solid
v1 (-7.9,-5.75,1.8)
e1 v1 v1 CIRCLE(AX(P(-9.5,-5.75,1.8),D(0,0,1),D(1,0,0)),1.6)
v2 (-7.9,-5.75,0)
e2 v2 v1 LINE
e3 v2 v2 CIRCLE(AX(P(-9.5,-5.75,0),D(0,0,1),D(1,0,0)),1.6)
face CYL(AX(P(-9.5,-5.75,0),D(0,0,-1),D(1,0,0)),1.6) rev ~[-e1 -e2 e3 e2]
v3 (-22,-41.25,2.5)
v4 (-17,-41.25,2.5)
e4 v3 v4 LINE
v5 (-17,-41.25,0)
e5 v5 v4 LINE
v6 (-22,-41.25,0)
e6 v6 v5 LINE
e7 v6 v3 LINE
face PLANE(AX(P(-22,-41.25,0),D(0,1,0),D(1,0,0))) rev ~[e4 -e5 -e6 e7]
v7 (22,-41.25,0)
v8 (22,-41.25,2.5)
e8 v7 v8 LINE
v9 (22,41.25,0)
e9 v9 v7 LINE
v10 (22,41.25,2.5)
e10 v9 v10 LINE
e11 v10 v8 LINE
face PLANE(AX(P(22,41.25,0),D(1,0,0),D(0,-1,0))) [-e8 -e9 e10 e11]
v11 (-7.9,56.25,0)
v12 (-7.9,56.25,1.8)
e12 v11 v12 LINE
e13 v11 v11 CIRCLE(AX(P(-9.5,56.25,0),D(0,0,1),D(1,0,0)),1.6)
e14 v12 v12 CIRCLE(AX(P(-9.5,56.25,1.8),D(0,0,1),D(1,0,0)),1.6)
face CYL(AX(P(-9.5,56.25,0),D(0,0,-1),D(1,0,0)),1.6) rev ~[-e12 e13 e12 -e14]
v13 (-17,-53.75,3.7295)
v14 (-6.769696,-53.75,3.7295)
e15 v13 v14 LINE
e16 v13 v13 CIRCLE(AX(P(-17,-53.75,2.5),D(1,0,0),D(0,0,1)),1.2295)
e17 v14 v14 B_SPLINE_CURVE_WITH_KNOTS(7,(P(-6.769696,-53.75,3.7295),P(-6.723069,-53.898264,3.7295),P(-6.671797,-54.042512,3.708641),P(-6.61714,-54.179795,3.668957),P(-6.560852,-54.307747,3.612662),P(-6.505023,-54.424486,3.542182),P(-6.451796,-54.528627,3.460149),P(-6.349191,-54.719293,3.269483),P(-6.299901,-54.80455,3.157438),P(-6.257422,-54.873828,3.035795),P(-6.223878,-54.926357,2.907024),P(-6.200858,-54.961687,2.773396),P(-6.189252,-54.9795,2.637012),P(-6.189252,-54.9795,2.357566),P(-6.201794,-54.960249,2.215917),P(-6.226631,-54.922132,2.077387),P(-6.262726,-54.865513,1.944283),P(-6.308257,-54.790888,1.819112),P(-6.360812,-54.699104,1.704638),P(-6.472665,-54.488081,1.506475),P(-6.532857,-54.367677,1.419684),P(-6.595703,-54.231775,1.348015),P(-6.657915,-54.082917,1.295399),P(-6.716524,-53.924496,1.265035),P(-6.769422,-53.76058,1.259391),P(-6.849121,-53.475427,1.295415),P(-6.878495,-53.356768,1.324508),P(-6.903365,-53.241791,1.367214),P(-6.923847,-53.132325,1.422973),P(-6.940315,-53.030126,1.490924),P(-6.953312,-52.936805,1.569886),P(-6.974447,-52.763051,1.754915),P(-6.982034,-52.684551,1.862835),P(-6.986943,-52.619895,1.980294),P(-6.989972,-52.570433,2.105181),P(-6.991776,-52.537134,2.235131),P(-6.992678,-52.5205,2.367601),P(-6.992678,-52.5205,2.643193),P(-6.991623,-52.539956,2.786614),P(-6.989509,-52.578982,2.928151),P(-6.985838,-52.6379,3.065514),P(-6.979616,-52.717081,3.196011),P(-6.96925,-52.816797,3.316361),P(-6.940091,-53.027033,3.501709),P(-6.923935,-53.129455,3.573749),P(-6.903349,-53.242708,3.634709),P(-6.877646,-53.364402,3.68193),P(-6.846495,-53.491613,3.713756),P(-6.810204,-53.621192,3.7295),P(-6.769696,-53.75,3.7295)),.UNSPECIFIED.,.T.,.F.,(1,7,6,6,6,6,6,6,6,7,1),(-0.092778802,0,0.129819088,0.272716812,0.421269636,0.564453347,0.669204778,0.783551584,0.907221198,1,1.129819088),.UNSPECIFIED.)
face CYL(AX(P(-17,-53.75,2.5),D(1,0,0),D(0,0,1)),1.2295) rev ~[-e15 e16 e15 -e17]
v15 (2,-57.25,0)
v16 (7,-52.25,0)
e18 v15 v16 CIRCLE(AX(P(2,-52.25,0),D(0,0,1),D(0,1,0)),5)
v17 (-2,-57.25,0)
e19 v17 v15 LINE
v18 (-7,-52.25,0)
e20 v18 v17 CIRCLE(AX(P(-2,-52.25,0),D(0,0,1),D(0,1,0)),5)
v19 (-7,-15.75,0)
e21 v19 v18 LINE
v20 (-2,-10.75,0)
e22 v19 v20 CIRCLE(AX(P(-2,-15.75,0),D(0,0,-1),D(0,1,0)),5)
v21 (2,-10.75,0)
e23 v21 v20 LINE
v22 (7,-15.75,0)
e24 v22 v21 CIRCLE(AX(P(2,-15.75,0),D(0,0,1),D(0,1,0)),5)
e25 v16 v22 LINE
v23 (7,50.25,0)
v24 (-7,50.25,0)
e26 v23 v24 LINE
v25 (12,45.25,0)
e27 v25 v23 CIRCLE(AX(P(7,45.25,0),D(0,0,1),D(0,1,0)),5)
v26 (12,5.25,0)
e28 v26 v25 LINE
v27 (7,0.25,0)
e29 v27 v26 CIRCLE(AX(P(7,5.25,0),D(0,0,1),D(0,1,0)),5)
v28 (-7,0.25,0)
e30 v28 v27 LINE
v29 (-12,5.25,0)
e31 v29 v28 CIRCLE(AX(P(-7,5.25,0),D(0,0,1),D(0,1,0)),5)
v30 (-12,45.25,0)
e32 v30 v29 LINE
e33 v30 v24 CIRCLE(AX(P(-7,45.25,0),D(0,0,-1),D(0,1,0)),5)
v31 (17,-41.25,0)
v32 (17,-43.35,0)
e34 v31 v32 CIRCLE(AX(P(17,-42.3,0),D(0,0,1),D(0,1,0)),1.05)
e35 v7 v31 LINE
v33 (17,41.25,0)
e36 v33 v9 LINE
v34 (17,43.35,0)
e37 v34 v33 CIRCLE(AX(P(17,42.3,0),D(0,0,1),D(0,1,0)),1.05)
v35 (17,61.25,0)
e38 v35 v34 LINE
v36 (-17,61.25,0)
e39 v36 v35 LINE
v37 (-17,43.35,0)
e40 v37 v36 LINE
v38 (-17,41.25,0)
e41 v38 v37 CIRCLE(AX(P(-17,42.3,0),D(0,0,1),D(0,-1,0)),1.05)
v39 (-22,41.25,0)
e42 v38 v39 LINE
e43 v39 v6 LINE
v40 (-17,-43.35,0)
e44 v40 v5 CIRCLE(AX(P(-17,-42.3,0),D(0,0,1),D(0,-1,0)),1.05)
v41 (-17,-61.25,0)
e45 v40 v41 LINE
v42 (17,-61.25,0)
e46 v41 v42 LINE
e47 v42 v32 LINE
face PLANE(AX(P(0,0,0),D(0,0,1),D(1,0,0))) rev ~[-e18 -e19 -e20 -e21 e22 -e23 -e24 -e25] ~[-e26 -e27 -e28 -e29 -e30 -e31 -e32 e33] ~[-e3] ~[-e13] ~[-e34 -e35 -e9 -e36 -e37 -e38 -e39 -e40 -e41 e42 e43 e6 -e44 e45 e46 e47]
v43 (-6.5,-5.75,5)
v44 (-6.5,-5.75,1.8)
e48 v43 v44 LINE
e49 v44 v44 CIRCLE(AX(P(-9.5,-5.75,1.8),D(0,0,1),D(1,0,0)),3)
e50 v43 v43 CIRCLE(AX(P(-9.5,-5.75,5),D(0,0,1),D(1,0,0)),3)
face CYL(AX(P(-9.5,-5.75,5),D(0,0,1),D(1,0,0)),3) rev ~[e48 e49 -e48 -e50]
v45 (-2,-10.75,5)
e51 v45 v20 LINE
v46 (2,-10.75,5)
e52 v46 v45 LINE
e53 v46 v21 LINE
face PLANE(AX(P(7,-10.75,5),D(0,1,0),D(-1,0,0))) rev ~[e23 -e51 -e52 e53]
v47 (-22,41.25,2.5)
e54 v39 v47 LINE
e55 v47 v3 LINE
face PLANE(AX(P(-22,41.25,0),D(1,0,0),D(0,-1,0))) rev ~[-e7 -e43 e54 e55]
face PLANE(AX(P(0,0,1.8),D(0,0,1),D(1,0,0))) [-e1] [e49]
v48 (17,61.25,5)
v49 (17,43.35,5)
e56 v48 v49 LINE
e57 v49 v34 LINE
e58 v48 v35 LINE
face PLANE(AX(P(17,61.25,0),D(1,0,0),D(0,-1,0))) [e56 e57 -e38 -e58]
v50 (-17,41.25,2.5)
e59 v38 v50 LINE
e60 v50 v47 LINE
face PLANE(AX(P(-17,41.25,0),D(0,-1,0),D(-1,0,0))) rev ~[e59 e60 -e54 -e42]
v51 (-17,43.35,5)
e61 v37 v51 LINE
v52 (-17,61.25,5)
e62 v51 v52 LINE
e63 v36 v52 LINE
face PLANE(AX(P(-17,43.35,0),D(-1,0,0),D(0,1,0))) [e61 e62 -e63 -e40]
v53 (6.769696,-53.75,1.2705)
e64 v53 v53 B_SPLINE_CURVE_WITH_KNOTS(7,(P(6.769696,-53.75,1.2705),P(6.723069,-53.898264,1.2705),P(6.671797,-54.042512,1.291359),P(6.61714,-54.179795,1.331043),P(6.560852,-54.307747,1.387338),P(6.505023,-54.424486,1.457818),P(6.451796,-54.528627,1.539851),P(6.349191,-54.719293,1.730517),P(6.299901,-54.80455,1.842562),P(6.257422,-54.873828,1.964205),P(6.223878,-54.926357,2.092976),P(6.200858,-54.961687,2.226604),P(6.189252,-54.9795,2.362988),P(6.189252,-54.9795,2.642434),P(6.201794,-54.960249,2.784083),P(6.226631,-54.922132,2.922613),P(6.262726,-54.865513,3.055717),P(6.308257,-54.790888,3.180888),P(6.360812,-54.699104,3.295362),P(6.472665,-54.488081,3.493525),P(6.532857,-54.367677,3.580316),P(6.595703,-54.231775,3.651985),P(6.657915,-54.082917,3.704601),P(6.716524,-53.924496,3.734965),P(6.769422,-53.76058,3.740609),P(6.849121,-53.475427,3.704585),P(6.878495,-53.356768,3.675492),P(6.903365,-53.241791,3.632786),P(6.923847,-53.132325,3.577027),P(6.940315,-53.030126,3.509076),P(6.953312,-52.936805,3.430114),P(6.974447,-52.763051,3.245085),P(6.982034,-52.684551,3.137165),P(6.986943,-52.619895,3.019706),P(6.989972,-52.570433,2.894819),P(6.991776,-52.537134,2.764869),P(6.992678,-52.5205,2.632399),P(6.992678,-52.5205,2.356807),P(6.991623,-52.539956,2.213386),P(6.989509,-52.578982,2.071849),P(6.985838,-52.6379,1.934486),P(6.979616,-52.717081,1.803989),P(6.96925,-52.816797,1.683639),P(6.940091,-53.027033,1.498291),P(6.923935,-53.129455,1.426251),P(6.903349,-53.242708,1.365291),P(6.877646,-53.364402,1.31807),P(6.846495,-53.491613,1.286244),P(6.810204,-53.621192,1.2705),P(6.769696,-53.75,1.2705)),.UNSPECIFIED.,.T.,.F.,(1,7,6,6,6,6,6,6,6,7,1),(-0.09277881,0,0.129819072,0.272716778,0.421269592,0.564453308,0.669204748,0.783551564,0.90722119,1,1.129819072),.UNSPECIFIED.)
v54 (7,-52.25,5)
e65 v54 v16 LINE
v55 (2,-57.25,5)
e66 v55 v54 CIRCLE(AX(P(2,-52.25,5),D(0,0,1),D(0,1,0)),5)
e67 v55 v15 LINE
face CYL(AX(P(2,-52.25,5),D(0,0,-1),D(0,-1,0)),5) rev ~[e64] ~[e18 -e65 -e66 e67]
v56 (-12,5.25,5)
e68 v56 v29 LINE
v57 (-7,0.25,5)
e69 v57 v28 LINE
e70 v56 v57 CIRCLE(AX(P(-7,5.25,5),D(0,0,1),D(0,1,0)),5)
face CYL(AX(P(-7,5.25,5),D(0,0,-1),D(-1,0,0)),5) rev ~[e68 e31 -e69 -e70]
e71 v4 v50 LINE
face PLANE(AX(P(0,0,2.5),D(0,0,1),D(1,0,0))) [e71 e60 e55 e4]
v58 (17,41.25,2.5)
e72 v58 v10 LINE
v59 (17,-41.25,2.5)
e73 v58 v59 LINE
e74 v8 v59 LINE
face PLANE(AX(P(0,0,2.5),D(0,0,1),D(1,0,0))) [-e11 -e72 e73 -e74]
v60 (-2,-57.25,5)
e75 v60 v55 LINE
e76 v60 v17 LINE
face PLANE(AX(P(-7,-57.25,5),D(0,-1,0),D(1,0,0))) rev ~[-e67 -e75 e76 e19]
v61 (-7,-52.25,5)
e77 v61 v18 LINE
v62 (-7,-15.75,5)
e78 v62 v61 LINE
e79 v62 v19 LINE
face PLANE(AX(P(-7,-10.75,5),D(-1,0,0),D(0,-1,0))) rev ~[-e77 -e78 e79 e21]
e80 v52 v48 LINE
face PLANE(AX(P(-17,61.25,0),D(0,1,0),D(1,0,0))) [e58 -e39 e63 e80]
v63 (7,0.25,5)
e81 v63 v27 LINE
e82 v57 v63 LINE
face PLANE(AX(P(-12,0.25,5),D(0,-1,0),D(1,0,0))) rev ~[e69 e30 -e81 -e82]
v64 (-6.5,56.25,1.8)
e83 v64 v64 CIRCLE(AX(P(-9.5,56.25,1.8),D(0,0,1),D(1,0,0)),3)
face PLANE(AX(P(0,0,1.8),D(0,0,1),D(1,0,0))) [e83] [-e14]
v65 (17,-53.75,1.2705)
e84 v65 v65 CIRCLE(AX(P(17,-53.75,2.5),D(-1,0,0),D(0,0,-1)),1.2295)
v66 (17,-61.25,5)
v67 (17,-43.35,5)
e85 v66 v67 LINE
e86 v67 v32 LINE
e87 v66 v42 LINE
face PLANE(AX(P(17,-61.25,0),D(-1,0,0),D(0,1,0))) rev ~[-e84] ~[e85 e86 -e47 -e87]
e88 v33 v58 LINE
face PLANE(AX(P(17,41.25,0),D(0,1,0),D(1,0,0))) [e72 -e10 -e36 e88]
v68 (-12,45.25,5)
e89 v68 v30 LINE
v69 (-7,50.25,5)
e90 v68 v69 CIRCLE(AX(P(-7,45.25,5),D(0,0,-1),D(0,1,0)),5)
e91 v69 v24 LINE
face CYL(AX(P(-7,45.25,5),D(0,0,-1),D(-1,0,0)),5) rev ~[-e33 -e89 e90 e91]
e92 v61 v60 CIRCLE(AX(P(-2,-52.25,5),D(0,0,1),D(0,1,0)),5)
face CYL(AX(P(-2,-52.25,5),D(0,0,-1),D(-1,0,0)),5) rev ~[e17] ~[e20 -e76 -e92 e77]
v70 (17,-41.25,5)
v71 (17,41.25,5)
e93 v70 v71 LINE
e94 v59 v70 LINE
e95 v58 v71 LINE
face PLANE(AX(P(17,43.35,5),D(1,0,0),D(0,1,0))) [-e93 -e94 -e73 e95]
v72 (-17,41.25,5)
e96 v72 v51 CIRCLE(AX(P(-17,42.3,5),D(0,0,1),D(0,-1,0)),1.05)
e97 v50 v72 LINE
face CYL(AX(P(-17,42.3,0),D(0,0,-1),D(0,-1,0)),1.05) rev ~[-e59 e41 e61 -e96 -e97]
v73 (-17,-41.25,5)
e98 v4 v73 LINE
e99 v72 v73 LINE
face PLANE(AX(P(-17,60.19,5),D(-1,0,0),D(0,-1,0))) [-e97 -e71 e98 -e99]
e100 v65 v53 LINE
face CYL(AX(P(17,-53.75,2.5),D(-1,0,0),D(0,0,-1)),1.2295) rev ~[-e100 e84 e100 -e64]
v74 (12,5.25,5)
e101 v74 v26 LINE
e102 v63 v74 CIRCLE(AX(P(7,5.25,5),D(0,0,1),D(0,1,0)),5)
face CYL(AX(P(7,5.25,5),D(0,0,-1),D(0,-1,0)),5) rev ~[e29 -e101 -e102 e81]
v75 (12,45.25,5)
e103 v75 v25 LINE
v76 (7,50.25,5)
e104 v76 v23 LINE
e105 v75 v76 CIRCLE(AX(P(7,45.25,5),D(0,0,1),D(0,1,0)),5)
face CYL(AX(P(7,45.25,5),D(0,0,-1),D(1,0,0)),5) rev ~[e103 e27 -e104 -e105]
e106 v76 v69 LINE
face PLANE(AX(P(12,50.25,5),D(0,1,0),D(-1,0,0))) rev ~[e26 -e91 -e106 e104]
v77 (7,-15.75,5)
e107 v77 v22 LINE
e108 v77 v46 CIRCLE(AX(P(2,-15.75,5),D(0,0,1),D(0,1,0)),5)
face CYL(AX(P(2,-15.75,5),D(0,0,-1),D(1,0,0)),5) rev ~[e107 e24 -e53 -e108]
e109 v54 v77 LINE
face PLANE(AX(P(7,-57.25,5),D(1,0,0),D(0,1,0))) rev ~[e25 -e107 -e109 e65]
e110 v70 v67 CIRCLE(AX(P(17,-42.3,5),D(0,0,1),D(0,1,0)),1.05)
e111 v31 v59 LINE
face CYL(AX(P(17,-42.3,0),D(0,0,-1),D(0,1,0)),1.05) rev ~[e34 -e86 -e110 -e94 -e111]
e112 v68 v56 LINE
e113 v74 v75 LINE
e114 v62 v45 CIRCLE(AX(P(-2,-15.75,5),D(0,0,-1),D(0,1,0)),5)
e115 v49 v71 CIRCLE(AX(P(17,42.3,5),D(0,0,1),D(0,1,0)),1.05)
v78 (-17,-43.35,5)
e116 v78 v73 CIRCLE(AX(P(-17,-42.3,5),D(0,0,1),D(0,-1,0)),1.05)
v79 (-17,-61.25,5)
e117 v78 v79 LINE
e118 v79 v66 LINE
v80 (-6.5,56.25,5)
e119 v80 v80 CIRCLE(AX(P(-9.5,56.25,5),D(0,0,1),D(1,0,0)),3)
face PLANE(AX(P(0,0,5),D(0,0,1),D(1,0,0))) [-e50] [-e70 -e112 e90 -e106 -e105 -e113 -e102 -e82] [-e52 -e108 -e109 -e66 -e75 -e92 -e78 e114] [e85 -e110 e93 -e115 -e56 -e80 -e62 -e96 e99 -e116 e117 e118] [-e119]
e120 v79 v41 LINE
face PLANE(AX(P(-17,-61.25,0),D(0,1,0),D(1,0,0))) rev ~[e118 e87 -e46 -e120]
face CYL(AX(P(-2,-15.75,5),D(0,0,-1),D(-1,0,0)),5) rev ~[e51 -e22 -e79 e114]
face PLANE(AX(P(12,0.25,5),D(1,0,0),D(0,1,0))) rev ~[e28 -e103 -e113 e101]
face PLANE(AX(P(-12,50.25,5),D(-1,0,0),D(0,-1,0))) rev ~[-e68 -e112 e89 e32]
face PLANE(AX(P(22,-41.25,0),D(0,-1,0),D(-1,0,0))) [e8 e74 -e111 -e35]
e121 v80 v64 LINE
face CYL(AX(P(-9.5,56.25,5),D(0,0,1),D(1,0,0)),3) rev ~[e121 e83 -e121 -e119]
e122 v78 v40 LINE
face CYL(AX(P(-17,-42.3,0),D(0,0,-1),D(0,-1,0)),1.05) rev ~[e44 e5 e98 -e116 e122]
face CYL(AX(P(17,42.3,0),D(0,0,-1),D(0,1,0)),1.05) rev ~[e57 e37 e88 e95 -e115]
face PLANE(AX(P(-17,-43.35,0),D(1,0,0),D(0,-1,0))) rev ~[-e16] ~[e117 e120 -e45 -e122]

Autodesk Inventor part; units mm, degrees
ref_plane "YZ Plane" through (0, 0, 0) normal (1, 0, 0) x (0, 1, 0)
ref_plane "XZ Plane" through (0, 0, 0) normal (0, 1, 0) x (-1, 0, 0)
ref_plane "XY Plane" through (0, 0, 0) normal (0, 0, 1) x (1, 0, 0)
sketch "スケッチ1" plane through (0, 0, 0) normal (0, 0, 1) x (1, 0, 0)
  line L0 (-17, -61.25) -> (17, -61.25) construction
  line L1 (17, -61.25) -> (17, 61.25) construction
  line L2 (17, 61.25) -> (-17, 61.25) construction
  line L3 (-17, 61.25) -> (-17, -61.25) construction
  line L4 (-17, -61.25) -> (17, 61.25) construction
  line L5 (17, -61.25) -> (-17, 61.25) construction
  line L6 (-17, 43.35) -> (-17, 61.25)
  line L7 (-17, 61.25) -> (17, 61.25)
  line L8 (17, 61.25) -> (17, 43.35)
  line L9 (-17, -43.35) -> (-17, -61.25)
  line L10 (-17, -61.25) -> (17, -61.25)
  line L11 (17, -61.25) -> (17, -43.35)
  line L12 (-17, 41.25) -> (-22, 41.25)
  line L13 (-22, 41.25) -> (-22, -41.25)
  line L14 (-22, -41.25) -> (-17, -41.25)
  line L15 (17, 41.25) -> (22, 41.25)
  line L16 (22, 41.25) -> (22, -41.25)
  line L17 (22, -41.25) -> (17, -41.25)
  arc A0 (-17, 41.25) -> (-17, 43.35) centre (-17, 42.3) ccw
  arc A1 (-17, -43.35) -> (-17, -41.25) centre (-17, -42.3) ccw
  arc A2 (17, 43.35) -> (17, 41.25) centre (17, 42.3) ccw
  arc A3 (17, -41.25) -> (17, -43.35) centre (17, -42.3) ccw
  line L18 (0, 0) -> (17, 0) construction
  line L19 (0, 0) -> (0, 61.25) construction
  line L20 (-9.5, 56.25) -> (9.5, 56.25) construction
  line L21 (9.5, 56.25) -> (9.5, -5.75) construction
  line L22 (9.5, -5.75) -> (-9.5, -5.75) construction
  line L23 (-9.5, -5.75) -> (-9.5, 56.25) construction
  circle A4 centre (-9.5, 56.25) radius 1.6
  circle A5 centre (-9.5, -5.75) radius 1.6
  point P0 (0, 56.25)
  point P1 (0, 0)
  dimension "d87" = 1.05
  dimension "d88" = 122.5
  dimension "d89" = 5
  dimension "d90" = 20
  dimension "d91" = 34
  dimension "d92" = 3.2
  dimension "d93" = 7.5
  dimension "d94" = 5
  dimension "d112" = 62
extrude "押し出し1" add sketch "スケッチ1" along normal blind 5
sketch "スケッチ2" plane through (0, 0, 5) normal (0, 0, 1) x (1, 0, 0)
  line L0 (-17, 61.25) -> (-17, 43.35) projected
  line L1 (17, 43.35) -> (17, 61.25) projected
  line L2 (-40.5884, 60.19) -> (-17, 60.19)
  line L3 (-17, 60.19) -> (-17, -101.7483)
  line L4 (-17, -101.7483) -> (-40.5884, -101.7483)
  line L5 (-40.5884, -101.7483) -> (-40.5884, 60.19)
  line L6 (53.5752, 90.4043) -> (17, 90.4043)
  line L7 (17, 90.4043) -> (17, -93.5321)
  line L8 (17, -93.5321) -> (53.5752, -93.5321)
  line L9 (53.5752, -93.5321) -> (53.5752, 90.4043)
  point P0 (0, 0)
extrude "押し出し2" cut sketch "スケッチ2" against normal blind 2.5
sketch "スケッチ3" plane through (0, 0, 5) normal (0, 0, 1) x (1, 0, 0)
  line L0 (17, -41.25) -> (17, 41.25) projected
  line L1 (17, 61.25) -> (-17, 61.25) projected
  line L2 (-17, 41.25) -> (-17, -41.25) projected
  line L3 (-17, -61.25) -> (17, -61.25) projected
  circle A0 centre (-9.5, -5.75) radius 1.6 projected
  circle A1 centre (-9.5, 56.25) radius 1.6 projected
  line L4 (-7, -57.25) -> (7, -57.25)
  line L5 (7, -57.25) -> (7, -10.75)
  line L6 (7, -10.75) -> (-7, -10.75)
  line L7 (-7, -10.75) -> (-7, -57.25)
  line L8 (-12, 0.25) -> (12, 0.25)
  line L9 (12, 0.25) -> (12, 50.25)
  line L10 (12, 50.25) -> (-12, 50.25)
  line L11 (-12, 50.25) -> (-12, 0.25)
  line L12 (0, 61.25) -> (0, -61.25) construction
  line L13 (-17, 0) -> (17, 0) construction
  point P0 (0, 0)
  point P1 (0, 0.25)
  dimension "d100" = 4
  dimension "d105" = 11
  dimension "d108" = 5
  dimension "d114" = 6
  dimension "d115" = 10
  dimension "d116" = 6
extrude "押し出し3" cut sketch "スケッチ3" against normal blind 10 contours L7 L6 L5 L4 | L11 L10 L9 L8
fillet "フィレット1" radius 5 8 edges at (-7, -57.25, 2.5) (-7, -10.75, 2.5) (7, -57.25, 2.5) (7, -10.75, 2.5) (-12, 0.25, 2.5) (-12, 50.25, 2.5) (12, 0.25, 2.5) (12, 50.25, 2.5)
sketch "スケッチ5" plane through (0, 0, 5) normal (0, 0, 1) x (1, 0, 0)
  circle A0 centre (-9.5, 56.25) radius 1.6 projected
  circle A1 centre (-9.5, -5.75) radius 1.6 projected
  circle A2 centre (-9.5, -5.75) radius 3
  circle A3 centre (-9.5, 56.25) radius 3
  point P0 (0, 0)
  dimension "d117" = 6
  dimension "d118" = 6
extrude "押し出し4" cut sketch "スケッチ5" against normal blind 3.2
sketch "スケッチ7" plane through (-17, -61.25, 0) normal (-1, 0, 0) x (0, 0, 1)
  line L0 (0, 0) -> (0, 17.9) projected
  line L1 (5, 17.9) -> (5, 0) projected
  line L2 (0, 0) -> (5, 0) projected
  point P0 (0, 61.25)
  point P1 (2.5, 7.5)
  dimension "d130" = 5
  dimension "d131" = 7.5
  dimension "d132" = 2.5
hole "穴1" at (-17, -53.75, 2.5) direction (1, 0, 0) diameter 2.459 depth 12 thread size "M3x0.5" class "6H" standard "ISO Metric profile"
sketch "スケッチ8" plane through (17, -61.25, 0) normal (1, 0, 0) x (0, 0, -1)
  line L0 (0, 0) -> (-5, 0) projected
  line L1 (-5, 0) -> (-5, 17.9) projected
  point P0 (0, 61.25)
  point P1 (-2.5, 7.5)
  dimension "d140" = 7.5
  dimension "d141" = 2.5
hole "穴2" at (17, -53.75, 2.5) direction (-1, 0, 0) diameter 2.459 depth 12 thread size "M3x0.5" class "6H" standard "ISO Metric profile"
equation "\"d88\" = d83"
equation "\"d90\" = d84"
equation "\"d132\" = 0.5 * d130"
equation "\"d140\" = d131"
equation "\"d141\" = d132"
equation "\"d83\" = 122.5"
equation "\"d84\" = 20"
properties part number "コックピット_2_サブフレーム_5" material "アセタール樹脂、黒"
